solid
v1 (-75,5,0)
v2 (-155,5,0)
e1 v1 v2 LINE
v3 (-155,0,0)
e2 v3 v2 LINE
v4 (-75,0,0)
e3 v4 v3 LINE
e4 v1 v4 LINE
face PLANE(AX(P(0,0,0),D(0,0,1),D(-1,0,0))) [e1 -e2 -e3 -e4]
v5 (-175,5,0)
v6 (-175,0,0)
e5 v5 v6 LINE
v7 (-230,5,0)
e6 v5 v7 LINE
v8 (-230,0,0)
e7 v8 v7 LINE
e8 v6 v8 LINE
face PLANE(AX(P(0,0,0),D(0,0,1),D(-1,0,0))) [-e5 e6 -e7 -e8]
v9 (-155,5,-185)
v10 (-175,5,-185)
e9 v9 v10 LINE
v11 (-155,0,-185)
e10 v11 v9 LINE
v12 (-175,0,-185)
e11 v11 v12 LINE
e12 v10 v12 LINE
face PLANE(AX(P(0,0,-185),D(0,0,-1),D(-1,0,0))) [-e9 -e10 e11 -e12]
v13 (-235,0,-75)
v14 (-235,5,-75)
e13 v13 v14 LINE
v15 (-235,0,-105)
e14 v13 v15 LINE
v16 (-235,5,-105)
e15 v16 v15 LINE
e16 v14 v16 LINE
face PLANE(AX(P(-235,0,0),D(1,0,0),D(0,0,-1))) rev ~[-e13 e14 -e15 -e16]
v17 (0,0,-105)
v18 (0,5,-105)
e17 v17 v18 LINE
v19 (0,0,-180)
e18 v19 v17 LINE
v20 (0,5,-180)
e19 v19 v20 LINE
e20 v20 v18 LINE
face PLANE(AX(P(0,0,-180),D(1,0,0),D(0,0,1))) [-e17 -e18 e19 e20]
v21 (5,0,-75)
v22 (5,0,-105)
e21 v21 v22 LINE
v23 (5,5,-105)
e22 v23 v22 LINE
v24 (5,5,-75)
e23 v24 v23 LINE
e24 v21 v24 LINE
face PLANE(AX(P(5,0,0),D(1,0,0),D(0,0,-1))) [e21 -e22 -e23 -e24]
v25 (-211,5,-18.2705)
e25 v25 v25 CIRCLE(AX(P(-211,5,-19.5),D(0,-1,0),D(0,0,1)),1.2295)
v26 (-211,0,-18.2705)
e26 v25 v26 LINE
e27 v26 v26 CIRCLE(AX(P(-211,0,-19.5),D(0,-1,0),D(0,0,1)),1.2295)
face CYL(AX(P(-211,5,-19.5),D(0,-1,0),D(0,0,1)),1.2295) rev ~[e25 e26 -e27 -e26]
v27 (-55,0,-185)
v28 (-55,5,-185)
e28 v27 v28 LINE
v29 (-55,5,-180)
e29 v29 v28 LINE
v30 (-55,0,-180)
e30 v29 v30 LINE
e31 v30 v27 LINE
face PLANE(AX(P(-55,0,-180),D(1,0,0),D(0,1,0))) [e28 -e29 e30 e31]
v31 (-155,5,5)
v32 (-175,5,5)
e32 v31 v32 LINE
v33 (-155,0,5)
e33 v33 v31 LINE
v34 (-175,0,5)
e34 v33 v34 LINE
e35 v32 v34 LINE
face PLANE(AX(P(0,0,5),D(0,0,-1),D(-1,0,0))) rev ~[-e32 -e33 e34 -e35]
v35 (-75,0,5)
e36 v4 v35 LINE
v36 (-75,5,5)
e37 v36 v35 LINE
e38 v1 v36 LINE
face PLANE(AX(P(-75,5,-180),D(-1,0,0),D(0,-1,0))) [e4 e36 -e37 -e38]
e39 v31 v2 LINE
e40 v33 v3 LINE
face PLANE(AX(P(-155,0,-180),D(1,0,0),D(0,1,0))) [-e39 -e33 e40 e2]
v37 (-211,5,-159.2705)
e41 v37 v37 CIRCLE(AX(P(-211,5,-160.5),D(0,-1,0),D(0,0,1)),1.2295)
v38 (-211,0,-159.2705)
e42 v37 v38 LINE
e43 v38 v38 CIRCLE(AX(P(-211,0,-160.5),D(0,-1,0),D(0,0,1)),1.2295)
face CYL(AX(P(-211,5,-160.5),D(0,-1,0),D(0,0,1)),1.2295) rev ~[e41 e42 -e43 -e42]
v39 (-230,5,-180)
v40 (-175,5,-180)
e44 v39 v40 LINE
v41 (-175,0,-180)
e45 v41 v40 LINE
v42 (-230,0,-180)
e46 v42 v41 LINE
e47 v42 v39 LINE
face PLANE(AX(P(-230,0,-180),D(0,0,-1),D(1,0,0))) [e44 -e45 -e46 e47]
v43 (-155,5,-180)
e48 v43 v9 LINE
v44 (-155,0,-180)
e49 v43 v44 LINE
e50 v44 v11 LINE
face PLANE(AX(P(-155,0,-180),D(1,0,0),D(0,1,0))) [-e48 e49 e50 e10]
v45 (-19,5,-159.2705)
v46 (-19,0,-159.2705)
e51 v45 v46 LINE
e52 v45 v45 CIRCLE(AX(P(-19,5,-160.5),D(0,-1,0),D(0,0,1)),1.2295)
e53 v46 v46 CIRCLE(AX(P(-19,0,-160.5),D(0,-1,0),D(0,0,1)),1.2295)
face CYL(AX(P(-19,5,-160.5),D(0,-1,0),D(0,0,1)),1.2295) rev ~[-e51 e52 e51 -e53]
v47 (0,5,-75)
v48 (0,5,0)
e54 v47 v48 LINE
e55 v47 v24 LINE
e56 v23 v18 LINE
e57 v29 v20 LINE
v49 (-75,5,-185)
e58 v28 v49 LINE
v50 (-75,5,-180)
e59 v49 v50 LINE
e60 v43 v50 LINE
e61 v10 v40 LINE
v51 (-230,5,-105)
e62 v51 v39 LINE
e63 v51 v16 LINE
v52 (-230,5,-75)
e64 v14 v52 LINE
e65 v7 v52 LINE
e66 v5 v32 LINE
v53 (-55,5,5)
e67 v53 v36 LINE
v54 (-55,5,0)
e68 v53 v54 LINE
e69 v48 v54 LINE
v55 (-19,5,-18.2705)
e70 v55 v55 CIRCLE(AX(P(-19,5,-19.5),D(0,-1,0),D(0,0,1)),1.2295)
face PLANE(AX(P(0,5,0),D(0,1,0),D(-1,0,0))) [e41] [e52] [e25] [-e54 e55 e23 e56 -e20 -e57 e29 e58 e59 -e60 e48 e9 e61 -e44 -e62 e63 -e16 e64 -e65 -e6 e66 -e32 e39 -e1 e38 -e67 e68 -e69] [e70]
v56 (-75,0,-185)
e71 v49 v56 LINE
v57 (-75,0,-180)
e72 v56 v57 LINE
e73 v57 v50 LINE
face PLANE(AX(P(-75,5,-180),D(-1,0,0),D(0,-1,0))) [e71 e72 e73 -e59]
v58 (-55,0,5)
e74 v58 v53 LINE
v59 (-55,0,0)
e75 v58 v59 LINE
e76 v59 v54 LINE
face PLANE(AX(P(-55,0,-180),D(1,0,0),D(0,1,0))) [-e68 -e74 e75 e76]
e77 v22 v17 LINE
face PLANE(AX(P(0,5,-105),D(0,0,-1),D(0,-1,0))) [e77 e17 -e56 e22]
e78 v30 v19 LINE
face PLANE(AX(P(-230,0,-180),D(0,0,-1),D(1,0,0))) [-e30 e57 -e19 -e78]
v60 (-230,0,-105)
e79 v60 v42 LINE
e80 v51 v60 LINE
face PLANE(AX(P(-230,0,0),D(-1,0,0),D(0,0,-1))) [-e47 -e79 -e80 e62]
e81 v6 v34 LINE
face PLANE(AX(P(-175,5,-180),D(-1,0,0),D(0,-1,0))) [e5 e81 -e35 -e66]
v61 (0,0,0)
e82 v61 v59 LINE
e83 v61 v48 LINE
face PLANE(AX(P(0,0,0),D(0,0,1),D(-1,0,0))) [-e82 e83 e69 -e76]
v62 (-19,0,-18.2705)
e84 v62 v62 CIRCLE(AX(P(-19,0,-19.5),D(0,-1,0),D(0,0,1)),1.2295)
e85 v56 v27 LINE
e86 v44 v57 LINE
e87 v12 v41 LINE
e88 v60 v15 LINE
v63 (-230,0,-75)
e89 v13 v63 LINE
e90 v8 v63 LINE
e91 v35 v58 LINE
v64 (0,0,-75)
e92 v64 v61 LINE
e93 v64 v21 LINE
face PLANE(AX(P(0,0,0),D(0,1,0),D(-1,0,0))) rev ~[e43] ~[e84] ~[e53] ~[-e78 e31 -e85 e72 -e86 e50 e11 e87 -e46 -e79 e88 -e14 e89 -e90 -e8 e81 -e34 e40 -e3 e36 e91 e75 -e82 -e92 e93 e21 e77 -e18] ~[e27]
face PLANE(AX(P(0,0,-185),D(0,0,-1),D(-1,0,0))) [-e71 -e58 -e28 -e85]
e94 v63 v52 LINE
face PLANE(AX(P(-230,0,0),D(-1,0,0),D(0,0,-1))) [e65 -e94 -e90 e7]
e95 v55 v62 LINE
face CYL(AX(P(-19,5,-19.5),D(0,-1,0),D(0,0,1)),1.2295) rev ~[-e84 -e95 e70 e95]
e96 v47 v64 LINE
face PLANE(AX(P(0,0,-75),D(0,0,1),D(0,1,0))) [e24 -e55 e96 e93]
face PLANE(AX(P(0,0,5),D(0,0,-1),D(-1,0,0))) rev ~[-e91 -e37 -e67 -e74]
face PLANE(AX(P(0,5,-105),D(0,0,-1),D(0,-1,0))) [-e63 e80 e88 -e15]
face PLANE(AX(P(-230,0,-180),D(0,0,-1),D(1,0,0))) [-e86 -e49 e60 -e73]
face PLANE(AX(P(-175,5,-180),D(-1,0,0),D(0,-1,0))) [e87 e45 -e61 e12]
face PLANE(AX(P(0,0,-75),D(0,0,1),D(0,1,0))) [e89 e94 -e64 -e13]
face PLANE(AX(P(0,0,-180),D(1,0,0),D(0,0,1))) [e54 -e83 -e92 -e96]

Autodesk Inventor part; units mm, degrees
ref_plane "YZ Plane" through (0, 0, 0) normal (1, 0, 0) x (0, 1, 0)
ref_plane "XZ Plane" through (0, 0, 0) normal (0, 1, 0) x (-1, 0, 0)
ref_plane "XY Plane" through (0, 0, 0) normal (0, 0, 1) x (1, 0, 0)
sketch "Sketch1" plane through (0, 0, 0) normal (0, 1, 0) x (-1, 0, 0)
  line L0 (0, 0) -> (230, 0)
  line L1 (230, 0) -> (230, -180)
  line L2 (230, -180) -> (0, -180)
  line L3 (0, -180) -> (0, 0)
  dimension "d0" = 180
  dimension "d1" = 230
extrude "Extrusion1" add sketch "Sketch1" along normal blind 5
sketch "Sketch2" plane through (0, 0, -180) normal (0, 0, -1) x (-1, 0, 0)
  line L0 (0, 5) -> (230, 5) projected
  line L1 (55, 5) -> (75, 5)
  line L2 (75, 5) -> (75, 0)
  line L3 (75, 0) -> (55, 0)
  line L4 (55, 0) -> (55, 5)
  line L5 (0, 0) -> (230, 0) projected
  line L6 (155, 5) -> (175, 5)
  line L7 (175, 5) -> (175, 0)
  line L8 (175, 0) -> (155, 0)
  line L9 (155, 0) -> (155, 5)
  line L10 (0, 0) -> (0, 5) projected
  line L11 (230, 0) -> (230, 5) projected
  point P0 (175, 2.5)
  point P1 (155, 2.5)
  point P2 (230, 2.5)
  dimension "d4" = 20
  dimension "d5" = 20
  dimension "d6" = 80
  dimension "d7" = 55
  dimension "d8" = 55
extrude "Extrusion2" add sketch "Sketch2" along normal blind 5 and the other way blind 185 contours L0 L2 L3 L4 | L0 L7 L5 L9
sketch "Sketch3" plane through (0, 0, 0) normal (1, 0, 0) x (0, 0, -1)
  line L0 (0, 5) -> (180, 5) projected
  line L1 (0, 0) -> (180, 0) projected
  line L2 (75, 5) -> (105, 5)
  line L3 (105, 5) -> (105, 0)
  line L4 (105, 0) -> (75, 0)
  line L5 (75, 0) -> (75, 5)
  line L6 (180, 0) -> (180, 5) projected
  point P0 (180, 2.5)
  dimension "d13" = 30
  dimension "d14" = 75
extrude "Extrusion3" add sketch "Sketch3" along normal blind 5 and the other way blind 235 contours L0 L3 L1 L5
sketch "Sketch4" plane through (0, 5, 0) normal (0, 1, 0) x (1, 0, 0)
  line L0 (-230, 75) -> (-230, 0) projected
  line L1 (0, 180) -> (-55, 180) projected
  point P0 (0, 0)
  point P1 (-211, 160.5)
  point P2 (-19, 160.5)
  point P3 (-19, 19.5)
  point P4 (-211, 19.5)
  point P5 (-230, 37.5)
  dimension "d19" = 141
  dimension "d20" = 192
  dimension "d21" = 19
  dimension "d22" = 141
  dimension "d23" = 0
  dimension "d24" = 19.5
hole "Hole1" at (-211, 5, -160.5) at (-19, 5, -160.5) at (-19, 5, -19.5) at (-211, 5, -19.5) direction (0, -1, 0) diameter 2.459 end through all thread size "M3x0.5" class "6H" standard "ANSI Metric M Profile"
properties part number "onderkant"
